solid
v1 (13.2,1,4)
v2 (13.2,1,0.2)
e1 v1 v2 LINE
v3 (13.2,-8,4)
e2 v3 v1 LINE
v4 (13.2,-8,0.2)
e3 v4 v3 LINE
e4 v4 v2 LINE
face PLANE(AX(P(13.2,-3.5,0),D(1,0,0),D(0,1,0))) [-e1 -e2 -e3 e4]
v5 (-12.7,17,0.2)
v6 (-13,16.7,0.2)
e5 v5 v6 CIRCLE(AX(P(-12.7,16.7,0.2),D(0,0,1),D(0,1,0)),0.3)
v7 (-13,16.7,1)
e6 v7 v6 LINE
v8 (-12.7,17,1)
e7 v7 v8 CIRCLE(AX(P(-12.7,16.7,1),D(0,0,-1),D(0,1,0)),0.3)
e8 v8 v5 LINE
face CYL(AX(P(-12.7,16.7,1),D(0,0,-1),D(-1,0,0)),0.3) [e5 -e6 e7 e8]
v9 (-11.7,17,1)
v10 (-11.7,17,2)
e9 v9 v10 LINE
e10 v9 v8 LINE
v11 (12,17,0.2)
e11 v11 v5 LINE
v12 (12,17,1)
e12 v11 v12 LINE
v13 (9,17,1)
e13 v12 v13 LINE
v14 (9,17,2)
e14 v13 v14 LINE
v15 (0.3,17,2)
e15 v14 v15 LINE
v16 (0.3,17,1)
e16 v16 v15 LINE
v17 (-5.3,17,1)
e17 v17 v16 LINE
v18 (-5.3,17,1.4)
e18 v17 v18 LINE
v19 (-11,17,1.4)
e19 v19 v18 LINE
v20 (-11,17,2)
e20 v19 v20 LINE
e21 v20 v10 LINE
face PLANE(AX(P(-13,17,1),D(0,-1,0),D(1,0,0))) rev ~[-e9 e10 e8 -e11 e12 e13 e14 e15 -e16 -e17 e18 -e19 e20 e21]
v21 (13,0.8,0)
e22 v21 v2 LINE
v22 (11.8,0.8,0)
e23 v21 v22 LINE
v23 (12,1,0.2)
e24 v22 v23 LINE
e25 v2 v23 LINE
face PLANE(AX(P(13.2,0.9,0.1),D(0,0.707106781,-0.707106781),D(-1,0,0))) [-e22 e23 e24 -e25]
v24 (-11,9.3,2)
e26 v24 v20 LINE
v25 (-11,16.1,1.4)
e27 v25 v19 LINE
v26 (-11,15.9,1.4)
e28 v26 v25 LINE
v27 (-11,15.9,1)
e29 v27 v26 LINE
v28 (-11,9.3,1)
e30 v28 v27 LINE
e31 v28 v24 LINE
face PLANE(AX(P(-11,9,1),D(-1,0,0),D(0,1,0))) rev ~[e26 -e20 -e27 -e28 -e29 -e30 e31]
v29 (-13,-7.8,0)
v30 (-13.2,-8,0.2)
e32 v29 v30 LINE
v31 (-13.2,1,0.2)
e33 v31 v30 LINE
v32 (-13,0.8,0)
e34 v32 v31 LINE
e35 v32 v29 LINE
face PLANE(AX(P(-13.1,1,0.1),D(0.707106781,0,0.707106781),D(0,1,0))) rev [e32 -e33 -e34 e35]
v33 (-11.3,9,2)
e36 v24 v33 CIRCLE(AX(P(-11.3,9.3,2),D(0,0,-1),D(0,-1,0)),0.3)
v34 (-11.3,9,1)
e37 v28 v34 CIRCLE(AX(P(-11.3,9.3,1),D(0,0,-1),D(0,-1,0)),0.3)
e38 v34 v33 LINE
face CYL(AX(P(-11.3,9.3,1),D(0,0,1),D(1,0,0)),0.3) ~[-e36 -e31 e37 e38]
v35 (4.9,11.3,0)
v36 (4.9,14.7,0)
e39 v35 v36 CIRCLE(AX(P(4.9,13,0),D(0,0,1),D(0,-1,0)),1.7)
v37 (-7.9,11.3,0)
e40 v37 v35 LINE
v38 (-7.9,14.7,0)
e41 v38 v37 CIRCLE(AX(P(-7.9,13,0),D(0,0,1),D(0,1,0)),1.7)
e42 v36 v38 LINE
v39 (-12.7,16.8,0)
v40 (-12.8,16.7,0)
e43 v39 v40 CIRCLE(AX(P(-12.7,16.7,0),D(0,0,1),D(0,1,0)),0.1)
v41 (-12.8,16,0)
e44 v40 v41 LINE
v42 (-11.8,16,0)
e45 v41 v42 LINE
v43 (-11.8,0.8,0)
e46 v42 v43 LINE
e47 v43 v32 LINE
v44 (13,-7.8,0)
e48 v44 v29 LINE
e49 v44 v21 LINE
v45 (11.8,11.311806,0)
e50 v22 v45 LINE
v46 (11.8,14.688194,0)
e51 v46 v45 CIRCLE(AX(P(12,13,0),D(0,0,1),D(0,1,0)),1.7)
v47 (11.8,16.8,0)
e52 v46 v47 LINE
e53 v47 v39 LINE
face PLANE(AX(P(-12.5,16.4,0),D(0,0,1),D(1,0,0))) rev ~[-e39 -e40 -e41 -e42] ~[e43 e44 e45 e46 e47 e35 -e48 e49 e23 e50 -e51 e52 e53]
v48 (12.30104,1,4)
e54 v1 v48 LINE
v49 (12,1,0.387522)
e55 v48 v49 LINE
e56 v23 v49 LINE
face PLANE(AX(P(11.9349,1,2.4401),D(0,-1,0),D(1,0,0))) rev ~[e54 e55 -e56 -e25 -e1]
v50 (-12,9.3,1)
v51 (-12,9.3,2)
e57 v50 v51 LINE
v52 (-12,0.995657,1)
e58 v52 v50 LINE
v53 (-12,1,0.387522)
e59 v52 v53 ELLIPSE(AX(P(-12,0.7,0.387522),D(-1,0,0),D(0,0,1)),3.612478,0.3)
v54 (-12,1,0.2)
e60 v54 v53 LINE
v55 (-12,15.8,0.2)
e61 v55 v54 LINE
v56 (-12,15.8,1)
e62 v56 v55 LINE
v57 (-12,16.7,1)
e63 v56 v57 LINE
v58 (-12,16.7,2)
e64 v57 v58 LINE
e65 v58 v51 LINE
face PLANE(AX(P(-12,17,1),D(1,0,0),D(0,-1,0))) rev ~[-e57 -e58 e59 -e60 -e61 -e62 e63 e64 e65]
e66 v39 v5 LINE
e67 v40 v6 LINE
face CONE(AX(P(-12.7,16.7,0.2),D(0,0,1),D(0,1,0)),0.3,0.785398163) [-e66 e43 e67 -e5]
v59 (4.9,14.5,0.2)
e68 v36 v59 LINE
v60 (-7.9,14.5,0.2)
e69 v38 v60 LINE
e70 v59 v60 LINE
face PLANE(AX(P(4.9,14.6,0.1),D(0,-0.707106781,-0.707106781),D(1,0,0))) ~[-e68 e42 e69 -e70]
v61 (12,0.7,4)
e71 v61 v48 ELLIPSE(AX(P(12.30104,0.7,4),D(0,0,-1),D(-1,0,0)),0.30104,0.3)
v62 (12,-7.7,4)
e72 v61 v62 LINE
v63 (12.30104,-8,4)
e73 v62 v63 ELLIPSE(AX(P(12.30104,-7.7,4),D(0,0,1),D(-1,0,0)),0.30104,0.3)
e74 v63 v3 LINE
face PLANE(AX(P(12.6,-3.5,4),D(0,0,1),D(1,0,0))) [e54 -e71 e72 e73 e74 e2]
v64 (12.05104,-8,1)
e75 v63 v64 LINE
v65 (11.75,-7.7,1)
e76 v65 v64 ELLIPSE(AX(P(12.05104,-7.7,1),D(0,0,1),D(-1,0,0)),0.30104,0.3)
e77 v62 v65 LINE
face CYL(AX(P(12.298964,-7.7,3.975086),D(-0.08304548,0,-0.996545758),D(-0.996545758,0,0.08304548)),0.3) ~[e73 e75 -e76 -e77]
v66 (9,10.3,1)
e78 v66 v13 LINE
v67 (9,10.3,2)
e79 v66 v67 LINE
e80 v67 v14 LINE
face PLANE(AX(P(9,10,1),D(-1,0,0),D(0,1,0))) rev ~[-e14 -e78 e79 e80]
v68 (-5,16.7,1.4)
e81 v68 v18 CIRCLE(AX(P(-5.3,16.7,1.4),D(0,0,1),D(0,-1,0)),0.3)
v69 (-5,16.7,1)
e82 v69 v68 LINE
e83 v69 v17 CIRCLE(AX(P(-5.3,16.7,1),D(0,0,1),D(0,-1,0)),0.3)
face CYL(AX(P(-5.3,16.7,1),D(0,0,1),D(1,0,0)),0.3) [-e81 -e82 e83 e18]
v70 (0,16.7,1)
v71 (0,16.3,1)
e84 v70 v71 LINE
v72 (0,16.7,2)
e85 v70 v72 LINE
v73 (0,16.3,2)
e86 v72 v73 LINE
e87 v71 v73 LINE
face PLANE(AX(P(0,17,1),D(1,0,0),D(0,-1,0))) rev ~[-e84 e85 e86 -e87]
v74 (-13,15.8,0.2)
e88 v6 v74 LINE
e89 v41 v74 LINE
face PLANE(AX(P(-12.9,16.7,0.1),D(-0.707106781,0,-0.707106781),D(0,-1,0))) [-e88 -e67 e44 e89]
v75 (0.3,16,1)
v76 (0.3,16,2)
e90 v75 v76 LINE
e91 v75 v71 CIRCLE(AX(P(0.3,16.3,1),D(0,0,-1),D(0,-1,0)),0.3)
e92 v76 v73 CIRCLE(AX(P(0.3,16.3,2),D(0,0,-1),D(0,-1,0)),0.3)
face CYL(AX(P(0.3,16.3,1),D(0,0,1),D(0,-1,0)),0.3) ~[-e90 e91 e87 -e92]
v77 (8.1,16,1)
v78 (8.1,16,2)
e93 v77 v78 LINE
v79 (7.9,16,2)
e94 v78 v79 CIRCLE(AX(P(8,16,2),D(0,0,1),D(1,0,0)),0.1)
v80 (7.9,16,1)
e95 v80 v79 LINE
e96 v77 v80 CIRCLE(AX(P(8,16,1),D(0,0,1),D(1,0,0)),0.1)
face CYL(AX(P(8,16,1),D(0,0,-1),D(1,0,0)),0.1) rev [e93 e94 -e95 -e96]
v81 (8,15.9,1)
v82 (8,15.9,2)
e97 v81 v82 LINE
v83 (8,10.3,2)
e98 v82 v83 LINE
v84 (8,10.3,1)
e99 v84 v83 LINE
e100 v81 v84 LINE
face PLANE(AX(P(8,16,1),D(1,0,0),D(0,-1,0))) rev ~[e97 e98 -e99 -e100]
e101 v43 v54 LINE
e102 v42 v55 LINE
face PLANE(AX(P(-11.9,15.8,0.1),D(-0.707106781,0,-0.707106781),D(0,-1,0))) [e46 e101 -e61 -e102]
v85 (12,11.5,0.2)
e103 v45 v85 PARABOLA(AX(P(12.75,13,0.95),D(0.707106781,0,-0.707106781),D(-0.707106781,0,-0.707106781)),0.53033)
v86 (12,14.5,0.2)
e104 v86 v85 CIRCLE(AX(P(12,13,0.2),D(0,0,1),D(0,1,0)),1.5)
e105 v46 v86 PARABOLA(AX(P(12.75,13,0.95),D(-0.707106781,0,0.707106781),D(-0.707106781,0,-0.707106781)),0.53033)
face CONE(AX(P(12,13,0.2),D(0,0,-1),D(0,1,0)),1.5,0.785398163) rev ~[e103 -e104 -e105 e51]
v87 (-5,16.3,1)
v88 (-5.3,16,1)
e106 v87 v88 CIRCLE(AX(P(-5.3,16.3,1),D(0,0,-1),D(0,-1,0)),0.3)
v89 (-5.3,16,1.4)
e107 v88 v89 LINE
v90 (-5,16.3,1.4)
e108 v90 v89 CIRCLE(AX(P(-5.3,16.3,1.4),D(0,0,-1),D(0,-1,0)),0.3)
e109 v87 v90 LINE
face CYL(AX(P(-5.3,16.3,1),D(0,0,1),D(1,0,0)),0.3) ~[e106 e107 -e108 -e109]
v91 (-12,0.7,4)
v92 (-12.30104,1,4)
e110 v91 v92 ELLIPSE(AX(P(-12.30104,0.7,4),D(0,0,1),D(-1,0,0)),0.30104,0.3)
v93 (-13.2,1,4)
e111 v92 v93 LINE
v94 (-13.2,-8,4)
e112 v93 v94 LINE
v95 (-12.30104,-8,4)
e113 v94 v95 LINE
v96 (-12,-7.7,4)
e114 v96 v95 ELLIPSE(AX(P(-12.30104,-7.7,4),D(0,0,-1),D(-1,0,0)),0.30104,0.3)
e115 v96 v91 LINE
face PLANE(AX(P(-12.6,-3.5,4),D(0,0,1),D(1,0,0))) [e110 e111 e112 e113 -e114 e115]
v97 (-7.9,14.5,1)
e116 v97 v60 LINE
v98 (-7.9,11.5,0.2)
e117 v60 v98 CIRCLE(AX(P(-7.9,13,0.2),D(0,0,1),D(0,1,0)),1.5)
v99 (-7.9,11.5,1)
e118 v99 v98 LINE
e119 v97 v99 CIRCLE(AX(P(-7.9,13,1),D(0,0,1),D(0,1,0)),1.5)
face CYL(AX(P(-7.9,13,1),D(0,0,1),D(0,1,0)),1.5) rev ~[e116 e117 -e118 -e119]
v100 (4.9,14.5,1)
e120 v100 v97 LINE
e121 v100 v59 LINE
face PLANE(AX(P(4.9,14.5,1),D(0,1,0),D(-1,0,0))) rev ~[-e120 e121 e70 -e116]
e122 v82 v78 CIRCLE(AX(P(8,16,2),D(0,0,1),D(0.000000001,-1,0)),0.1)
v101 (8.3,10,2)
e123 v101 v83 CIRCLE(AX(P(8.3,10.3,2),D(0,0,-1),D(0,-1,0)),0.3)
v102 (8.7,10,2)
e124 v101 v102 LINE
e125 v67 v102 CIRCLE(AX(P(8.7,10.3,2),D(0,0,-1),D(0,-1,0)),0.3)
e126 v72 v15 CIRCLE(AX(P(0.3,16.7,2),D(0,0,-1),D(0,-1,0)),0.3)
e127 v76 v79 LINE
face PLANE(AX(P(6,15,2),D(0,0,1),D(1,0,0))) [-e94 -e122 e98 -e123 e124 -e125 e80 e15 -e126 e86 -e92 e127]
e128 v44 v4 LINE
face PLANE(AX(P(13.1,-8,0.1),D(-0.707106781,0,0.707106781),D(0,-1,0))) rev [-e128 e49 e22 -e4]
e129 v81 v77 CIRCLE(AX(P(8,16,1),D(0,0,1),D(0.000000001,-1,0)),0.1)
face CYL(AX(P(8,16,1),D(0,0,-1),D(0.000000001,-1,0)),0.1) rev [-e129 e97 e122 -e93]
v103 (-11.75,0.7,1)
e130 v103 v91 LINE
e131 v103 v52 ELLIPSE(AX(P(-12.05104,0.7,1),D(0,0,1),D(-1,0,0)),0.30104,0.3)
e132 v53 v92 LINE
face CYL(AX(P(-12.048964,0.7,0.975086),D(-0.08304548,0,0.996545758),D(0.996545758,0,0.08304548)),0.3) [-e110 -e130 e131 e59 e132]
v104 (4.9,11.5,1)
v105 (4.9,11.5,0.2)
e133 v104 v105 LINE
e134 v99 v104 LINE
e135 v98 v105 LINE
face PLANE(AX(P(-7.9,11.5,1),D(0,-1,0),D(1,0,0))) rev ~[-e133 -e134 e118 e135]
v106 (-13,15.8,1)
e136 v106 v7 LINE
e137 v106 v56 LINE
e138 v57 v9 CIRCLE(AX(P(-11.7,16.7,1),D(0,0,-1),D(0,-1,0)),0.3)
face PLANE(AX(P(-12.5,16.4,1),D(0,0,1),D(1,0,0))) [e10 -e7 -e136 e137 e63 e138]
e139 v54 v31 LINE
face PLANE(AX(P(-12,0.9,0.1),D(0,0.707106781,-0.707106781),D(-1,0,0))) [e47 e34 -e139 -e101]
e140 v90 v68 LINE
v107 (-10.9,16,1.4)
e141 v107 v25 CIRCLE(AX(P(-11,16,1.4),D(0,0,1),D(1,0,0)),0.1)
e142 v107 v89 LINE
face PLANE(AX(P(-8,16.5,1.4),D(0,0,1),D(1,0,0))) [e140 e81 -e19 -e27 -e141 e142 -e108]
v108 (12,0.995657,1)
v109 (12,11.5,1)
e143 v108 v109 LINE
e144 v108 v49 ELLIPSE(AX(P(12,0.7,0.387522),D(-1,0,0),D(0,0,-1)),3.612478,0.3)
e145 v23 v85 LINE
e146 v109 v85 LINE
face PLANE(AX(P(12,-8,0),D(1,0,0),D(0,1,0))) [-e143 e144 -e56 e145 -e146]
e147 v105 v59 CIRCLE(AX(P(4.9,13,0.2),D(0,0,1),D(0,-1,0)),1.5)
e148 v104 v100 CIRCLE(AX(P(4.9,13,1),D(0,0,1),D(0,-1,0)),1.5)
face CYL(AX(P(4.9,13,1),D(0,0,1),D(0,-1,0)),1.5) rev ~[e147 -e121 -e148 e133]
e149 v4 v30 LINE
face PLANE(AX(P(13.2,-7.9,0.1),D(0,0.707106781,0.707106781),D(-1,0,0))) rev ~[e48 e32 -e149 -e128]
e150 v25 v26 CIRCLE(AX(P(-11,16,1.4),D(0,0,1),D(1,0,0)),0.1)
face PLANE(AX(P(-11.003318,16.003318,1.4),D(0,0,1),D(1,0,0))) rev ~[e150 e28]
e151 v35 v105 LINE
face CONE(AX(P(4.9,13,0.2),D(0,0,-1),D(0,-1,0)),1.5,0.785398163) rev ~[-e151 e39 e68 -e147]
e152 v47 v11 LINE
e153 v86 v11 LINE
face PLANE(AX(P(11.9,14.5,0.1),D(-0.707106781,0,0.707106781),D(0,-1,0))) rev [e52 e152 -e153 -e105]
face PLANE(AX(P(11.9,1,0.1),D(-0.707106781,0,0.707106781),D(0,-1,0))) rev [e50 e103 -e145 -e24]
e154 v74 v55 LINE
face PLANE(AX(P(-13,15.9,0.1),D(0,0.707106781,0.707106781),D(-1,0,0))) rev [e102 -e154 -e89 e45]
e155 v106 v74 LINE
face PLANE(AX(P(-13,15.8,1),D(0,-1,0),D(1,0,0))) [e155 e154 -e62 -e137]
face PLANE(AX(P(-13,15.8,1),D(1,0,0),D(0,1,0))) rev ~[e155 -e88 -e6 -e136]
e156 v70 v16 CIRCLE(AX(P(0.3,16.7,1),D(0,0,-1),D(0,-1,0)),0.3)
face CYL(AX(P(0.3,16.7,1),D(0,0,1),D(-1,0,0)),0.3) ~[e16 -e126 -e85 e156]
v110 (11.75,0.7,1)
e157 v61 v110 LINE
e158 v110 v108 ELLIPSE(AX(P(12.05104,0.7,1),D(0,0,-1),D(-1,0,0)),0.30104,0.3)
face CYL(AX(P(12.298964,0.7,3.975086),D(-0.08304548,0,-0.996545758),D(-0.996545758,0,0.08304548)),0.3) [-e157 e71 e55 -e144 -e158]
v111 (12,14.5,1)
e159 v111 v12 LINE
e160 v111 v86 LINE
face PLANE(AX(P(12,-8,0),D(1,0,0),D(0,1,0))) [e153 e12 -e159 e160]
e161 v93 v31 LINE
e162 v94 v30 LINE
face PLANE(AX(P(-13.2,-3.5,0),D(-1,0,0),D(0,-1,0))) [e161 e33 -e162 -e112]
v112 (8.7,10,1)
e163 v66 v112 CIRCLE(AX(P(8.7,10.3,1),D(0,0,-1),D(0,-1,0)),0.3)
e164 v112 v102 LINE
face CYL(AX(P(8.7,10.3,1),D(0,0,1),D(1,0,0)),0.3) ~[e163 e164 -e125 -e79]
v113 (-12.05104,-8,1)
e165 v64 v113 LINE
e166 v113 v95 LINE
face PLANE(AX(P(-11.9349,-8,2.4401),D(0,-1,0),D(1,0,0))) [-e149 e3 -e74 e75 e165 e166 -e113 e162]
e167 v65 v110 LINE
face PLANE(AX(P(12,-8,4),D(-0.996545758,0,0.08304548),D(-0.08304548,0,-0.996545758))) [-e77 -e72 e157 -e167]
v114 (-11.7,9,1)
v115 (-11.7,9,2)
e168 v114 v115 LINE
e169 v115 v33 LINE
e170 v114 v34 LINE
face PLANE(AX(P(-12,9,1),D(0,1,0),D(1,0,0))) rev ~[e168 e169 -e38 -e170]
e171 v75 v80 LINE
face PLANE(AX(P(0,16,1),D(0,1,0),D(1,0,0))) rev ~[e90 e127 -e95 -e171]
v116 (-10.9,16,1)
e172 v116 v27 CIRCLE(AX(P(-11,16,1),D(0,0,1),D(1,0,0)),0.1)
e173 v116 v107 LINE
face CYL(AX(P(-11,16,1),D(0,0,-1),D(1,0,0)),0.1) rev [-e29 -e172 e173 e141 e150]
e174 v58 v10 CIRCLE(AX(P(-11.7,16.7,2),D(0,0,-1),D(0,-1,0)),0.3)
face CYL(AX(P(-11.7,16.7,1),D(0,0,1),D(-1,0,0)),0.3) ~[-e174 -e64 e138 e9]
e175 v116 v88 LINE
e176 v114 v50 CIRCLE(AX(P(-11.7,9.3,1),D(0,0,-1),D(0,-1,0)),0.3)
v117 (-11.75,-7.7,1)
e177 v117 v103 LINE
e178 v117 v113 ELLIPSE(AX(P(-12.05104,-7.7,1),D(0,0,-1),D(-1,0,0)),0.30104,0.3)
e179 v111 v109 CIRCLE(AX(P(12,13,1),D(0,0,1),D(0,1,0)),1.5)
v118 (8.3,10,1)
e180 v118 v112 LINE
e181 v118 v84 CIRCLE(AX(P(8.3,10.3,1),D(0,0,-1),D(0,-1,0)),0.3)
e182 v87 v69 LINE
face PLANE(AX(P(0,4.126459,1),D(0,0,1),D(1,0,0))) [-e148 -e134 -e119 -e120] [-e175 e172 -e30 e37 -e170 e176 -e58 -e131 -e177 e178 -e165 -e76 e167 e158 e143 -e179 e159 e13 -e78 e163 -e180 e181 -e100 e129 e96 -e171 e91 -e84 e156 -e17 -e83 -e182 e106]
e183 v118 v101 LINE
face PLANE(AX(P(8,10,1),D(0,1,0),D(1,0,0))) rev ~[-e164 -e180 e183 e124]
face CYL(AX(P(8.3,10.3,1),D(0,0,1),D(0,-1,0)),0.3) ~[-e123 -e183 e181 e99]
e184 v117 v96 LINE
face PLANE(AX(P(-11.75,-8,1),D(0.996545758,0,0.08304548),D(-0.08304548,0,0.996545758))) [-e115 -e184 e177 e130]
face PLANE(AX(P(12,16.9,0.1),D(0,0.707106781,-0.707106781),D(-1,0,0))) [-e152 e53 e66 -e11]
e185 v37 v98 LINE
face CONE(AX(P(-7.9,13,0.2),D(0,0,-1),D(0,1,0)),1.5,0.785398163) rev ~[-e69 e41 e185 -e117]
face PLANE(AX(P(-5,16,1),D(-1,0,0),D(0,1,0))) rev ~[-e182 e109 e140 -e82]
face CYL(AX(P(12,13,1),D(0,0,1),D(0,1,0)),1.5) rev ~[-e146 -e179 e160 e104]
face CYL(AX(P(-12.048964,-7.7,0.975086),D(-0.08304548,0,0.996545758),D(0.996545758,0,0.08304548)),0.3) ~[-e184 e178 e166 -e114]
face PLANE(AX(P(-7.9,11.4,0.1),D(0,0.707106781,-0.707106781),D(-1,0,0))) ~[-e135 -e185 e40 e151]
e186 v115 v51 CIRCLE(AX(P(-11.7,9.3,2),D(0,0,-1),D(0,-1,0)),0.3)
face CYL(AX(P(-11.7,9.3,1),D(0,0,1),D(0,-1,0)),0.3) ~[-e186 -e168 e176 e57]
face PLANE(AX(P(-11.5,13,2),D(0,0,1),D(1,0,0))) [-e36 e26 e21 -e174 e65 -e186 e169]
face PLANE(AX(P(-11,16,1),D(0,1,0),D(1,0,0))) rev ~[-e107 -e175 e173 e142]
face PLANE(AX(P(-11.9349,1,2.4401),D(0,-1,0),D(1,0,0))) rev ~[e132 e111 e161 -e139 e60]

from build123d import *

# Parameters (mm, degrees)
F0_W      = 1.2
F0_H      = 9
F5_DEPTH  = 9
F7_DEPTH  = 1
F6_W      = 6
F6_H      = 1
F8_DEPTH  = 0.4
F9_DEPTH  = 1
F6_W_2    = 1
F6_H_2    = 1.2
F10_DEPTH = 1
F11_R     = 0.3
F13_DEPTH = 1
F14_DEPTH = 0.4
F15_SIZE  = 0.2


with BuildPart() as f2:
    # F2: sweep along a path in F1
    with BuildLine(Plane.XZ) as f2_path:
        Line((0, 0), (0, 1))
    # F0 (on Top) → F2 (sweep)
    with BuildSketch(Plane.XY):
        Polygon((-12, -8), (12, -8), (12, 1), (12, 8), (12, 9), (12, 17), (-12, 17), (-12, 9), (-12, 8), (-12, 1), align=None)
        with Locations((-12.6, -3.5)):
            Rectangle(F0_W, F0_H)
        with Locations((12.6, -3.5)):
            Rectangle(F0_W, F0_H)
    sweep(path=f2_path.line)

    # F3: sweep along a path in F1
    with BuildLine(Plane.XZ) as f3_path:
        Line((0, 0), (0, 1))
        Line((0, 1), (0, 4))
    # F0 (on Top) → F3 (sweep)
    with BuildSketch(Plane.XY):
        with Locations((-12.6, -3.5)):
            Rectangle(F0_W, F0_H)
        with Locations((12.6, -3.5)):
            Rectangle(F0_W, F0_H)
    sweep(path=f3_path.line)

    # F4 (on face) → F5 (join, through all)
    with BuildSketch(Plane.XZ.offset(8)):
        Polygon((-11.75, 1), (-12, 4), (-12, 1), align=None)
        Polygon((12, 1), (12, 4), (11.75, 1), align=None)
    extrude(amount=-F5_DEPTH)

    # F6 (on face) → F7 (join)
    with BuildSketch(Plane.XY.offset(1)):
        Polygon((-11, 17), (-12, 17), (-12, 15.8), (-12, 9), (-11, 9), (-11, 16), align=None)
        Polygon((9, 17), (0, 17), (0, 16), (8, 16), (8, 10), (9, 10), align=None)
    extrude(amount=F7_DEPTH)

    # F6 (on face) → F8 (join)
    with BuildSketch(Plane.XY.offset(1)):
        with Locations((-8, 16.5)):
            Rectangle(F6_W, F6_H)
    extrude(amount=F8_DEPTH)

    # F6 (on face) → F9 (cut, through all)
    with BuildSketch(Plane.XY.offset(1)):
        with BuildLine():
            ThreePointArc((-7.9, 14.5), (-9.4, 13), (-7.9, 11.5))
            Line((-7.9, 11.5), (4.9, 11.5))
            ThreePointArc((4.9, 11.5), (6.4, 13), (4.9, 14.5))
            Line((4.9, 14.5), (-7.9, 14.5))
        make_face()
        with BuildLine():
            Line((12, 11.5), (12, 14.5))
            ThreePointArc((12, 14.5), (10.5, 13), (12, 11.5))
        make_face()
    extrude(amount=-F9_DEPTH, mode=Mode.SUBTRACT)

    # F6 (on face) → F10 (join, through all)
    with BuildSketch(Plane.XY.offset(1)):
        with Locations((-12.5, 16.4)):
            Rectangle(F6_W_2, F6_H_2)
    extrude(amount=-F10_DEPTH)

    # F11
    f11_edges = [f2.edges().sort_by_distance(p)[0] for p in [
        (-11.875, -8, 2.5),
        (-11.875, 1, 2.5),
        (11.875, -8, 2.5),
        (-11, 9, 1.5),
        (0, 16, 1.5),
        (0, 17, 1.5),
        (8, 10, 1.5),
        (9, 10, 1.5),
        (-12, 9, 1.5),
        (-12, 17, 1.5),
        (-13, 17, 0.5),
        (-5, 16, 1.2),
        (-5, 17, 1.2),
        (11.875, 1, 2.5),
    ]]
    fillet(f11_edges, radius=F11_R)

    # F12 (on face) → F13 (cut, through all)
    with BuildSketch(Plane.XY.offset(1)):
        with BuildLine():
            ThreePointArc((8, 15.9), (8.0707106781, 15.9292893219), (8.1, 16))
            ThreePointArc((8.1, 16), (8, 16.1), (7.9, 16))
            Line((7.9, 16), (8, 16))
            Line((8, 16), (8, 15.9))
        make_face()
    extrude(amount=F13_DEPTH, mode=Mode.SUBTRACT)

    # F12 (on face) → F14 (cut, through all)
    with BuildSketch(Plane.XY.offset(1)):
        with BuildLine():
            Line((-11, 16), (-10.9, 16))
            ThreePointArc((-10.9, 16), (-11.0707106781, 16.0707106781), (-11, 15.9))
            Line((-11, 15.9), (-11, 16))
        make_face()
    extrude(amount=F14_DEPTH, mode=Mode.SUBTRACT)

    # F15
    f15_edges = [f2.edges().sort_by_distance(p)[0] for p in [
        (-0.35, 17, 0),
        (-12.912132, 16.912132, 0),
        (12, 15.75, 0),
        (-13, 16.25, 0),
        (10.5, 13, 0),
        (-12.5, 15.8, 0),
        (12, 6.25, 0),
        (-12, 8.4, 0),
        (12.6, 1, 0),
        (-12.6, 1, 0),
        (13.2, -3.5, 0),
        (-13.2, -3.5, 0),
        (0, -8, 0),
        (-9.4, 13, 0),
        (-1.5, 14.5, 0),
        (6.4, 13, 0),
        (-1.5, 11.5, 0),
    ]]
    chamfer(f15_edges, length=F15_SIZE)


solid = f2.part
